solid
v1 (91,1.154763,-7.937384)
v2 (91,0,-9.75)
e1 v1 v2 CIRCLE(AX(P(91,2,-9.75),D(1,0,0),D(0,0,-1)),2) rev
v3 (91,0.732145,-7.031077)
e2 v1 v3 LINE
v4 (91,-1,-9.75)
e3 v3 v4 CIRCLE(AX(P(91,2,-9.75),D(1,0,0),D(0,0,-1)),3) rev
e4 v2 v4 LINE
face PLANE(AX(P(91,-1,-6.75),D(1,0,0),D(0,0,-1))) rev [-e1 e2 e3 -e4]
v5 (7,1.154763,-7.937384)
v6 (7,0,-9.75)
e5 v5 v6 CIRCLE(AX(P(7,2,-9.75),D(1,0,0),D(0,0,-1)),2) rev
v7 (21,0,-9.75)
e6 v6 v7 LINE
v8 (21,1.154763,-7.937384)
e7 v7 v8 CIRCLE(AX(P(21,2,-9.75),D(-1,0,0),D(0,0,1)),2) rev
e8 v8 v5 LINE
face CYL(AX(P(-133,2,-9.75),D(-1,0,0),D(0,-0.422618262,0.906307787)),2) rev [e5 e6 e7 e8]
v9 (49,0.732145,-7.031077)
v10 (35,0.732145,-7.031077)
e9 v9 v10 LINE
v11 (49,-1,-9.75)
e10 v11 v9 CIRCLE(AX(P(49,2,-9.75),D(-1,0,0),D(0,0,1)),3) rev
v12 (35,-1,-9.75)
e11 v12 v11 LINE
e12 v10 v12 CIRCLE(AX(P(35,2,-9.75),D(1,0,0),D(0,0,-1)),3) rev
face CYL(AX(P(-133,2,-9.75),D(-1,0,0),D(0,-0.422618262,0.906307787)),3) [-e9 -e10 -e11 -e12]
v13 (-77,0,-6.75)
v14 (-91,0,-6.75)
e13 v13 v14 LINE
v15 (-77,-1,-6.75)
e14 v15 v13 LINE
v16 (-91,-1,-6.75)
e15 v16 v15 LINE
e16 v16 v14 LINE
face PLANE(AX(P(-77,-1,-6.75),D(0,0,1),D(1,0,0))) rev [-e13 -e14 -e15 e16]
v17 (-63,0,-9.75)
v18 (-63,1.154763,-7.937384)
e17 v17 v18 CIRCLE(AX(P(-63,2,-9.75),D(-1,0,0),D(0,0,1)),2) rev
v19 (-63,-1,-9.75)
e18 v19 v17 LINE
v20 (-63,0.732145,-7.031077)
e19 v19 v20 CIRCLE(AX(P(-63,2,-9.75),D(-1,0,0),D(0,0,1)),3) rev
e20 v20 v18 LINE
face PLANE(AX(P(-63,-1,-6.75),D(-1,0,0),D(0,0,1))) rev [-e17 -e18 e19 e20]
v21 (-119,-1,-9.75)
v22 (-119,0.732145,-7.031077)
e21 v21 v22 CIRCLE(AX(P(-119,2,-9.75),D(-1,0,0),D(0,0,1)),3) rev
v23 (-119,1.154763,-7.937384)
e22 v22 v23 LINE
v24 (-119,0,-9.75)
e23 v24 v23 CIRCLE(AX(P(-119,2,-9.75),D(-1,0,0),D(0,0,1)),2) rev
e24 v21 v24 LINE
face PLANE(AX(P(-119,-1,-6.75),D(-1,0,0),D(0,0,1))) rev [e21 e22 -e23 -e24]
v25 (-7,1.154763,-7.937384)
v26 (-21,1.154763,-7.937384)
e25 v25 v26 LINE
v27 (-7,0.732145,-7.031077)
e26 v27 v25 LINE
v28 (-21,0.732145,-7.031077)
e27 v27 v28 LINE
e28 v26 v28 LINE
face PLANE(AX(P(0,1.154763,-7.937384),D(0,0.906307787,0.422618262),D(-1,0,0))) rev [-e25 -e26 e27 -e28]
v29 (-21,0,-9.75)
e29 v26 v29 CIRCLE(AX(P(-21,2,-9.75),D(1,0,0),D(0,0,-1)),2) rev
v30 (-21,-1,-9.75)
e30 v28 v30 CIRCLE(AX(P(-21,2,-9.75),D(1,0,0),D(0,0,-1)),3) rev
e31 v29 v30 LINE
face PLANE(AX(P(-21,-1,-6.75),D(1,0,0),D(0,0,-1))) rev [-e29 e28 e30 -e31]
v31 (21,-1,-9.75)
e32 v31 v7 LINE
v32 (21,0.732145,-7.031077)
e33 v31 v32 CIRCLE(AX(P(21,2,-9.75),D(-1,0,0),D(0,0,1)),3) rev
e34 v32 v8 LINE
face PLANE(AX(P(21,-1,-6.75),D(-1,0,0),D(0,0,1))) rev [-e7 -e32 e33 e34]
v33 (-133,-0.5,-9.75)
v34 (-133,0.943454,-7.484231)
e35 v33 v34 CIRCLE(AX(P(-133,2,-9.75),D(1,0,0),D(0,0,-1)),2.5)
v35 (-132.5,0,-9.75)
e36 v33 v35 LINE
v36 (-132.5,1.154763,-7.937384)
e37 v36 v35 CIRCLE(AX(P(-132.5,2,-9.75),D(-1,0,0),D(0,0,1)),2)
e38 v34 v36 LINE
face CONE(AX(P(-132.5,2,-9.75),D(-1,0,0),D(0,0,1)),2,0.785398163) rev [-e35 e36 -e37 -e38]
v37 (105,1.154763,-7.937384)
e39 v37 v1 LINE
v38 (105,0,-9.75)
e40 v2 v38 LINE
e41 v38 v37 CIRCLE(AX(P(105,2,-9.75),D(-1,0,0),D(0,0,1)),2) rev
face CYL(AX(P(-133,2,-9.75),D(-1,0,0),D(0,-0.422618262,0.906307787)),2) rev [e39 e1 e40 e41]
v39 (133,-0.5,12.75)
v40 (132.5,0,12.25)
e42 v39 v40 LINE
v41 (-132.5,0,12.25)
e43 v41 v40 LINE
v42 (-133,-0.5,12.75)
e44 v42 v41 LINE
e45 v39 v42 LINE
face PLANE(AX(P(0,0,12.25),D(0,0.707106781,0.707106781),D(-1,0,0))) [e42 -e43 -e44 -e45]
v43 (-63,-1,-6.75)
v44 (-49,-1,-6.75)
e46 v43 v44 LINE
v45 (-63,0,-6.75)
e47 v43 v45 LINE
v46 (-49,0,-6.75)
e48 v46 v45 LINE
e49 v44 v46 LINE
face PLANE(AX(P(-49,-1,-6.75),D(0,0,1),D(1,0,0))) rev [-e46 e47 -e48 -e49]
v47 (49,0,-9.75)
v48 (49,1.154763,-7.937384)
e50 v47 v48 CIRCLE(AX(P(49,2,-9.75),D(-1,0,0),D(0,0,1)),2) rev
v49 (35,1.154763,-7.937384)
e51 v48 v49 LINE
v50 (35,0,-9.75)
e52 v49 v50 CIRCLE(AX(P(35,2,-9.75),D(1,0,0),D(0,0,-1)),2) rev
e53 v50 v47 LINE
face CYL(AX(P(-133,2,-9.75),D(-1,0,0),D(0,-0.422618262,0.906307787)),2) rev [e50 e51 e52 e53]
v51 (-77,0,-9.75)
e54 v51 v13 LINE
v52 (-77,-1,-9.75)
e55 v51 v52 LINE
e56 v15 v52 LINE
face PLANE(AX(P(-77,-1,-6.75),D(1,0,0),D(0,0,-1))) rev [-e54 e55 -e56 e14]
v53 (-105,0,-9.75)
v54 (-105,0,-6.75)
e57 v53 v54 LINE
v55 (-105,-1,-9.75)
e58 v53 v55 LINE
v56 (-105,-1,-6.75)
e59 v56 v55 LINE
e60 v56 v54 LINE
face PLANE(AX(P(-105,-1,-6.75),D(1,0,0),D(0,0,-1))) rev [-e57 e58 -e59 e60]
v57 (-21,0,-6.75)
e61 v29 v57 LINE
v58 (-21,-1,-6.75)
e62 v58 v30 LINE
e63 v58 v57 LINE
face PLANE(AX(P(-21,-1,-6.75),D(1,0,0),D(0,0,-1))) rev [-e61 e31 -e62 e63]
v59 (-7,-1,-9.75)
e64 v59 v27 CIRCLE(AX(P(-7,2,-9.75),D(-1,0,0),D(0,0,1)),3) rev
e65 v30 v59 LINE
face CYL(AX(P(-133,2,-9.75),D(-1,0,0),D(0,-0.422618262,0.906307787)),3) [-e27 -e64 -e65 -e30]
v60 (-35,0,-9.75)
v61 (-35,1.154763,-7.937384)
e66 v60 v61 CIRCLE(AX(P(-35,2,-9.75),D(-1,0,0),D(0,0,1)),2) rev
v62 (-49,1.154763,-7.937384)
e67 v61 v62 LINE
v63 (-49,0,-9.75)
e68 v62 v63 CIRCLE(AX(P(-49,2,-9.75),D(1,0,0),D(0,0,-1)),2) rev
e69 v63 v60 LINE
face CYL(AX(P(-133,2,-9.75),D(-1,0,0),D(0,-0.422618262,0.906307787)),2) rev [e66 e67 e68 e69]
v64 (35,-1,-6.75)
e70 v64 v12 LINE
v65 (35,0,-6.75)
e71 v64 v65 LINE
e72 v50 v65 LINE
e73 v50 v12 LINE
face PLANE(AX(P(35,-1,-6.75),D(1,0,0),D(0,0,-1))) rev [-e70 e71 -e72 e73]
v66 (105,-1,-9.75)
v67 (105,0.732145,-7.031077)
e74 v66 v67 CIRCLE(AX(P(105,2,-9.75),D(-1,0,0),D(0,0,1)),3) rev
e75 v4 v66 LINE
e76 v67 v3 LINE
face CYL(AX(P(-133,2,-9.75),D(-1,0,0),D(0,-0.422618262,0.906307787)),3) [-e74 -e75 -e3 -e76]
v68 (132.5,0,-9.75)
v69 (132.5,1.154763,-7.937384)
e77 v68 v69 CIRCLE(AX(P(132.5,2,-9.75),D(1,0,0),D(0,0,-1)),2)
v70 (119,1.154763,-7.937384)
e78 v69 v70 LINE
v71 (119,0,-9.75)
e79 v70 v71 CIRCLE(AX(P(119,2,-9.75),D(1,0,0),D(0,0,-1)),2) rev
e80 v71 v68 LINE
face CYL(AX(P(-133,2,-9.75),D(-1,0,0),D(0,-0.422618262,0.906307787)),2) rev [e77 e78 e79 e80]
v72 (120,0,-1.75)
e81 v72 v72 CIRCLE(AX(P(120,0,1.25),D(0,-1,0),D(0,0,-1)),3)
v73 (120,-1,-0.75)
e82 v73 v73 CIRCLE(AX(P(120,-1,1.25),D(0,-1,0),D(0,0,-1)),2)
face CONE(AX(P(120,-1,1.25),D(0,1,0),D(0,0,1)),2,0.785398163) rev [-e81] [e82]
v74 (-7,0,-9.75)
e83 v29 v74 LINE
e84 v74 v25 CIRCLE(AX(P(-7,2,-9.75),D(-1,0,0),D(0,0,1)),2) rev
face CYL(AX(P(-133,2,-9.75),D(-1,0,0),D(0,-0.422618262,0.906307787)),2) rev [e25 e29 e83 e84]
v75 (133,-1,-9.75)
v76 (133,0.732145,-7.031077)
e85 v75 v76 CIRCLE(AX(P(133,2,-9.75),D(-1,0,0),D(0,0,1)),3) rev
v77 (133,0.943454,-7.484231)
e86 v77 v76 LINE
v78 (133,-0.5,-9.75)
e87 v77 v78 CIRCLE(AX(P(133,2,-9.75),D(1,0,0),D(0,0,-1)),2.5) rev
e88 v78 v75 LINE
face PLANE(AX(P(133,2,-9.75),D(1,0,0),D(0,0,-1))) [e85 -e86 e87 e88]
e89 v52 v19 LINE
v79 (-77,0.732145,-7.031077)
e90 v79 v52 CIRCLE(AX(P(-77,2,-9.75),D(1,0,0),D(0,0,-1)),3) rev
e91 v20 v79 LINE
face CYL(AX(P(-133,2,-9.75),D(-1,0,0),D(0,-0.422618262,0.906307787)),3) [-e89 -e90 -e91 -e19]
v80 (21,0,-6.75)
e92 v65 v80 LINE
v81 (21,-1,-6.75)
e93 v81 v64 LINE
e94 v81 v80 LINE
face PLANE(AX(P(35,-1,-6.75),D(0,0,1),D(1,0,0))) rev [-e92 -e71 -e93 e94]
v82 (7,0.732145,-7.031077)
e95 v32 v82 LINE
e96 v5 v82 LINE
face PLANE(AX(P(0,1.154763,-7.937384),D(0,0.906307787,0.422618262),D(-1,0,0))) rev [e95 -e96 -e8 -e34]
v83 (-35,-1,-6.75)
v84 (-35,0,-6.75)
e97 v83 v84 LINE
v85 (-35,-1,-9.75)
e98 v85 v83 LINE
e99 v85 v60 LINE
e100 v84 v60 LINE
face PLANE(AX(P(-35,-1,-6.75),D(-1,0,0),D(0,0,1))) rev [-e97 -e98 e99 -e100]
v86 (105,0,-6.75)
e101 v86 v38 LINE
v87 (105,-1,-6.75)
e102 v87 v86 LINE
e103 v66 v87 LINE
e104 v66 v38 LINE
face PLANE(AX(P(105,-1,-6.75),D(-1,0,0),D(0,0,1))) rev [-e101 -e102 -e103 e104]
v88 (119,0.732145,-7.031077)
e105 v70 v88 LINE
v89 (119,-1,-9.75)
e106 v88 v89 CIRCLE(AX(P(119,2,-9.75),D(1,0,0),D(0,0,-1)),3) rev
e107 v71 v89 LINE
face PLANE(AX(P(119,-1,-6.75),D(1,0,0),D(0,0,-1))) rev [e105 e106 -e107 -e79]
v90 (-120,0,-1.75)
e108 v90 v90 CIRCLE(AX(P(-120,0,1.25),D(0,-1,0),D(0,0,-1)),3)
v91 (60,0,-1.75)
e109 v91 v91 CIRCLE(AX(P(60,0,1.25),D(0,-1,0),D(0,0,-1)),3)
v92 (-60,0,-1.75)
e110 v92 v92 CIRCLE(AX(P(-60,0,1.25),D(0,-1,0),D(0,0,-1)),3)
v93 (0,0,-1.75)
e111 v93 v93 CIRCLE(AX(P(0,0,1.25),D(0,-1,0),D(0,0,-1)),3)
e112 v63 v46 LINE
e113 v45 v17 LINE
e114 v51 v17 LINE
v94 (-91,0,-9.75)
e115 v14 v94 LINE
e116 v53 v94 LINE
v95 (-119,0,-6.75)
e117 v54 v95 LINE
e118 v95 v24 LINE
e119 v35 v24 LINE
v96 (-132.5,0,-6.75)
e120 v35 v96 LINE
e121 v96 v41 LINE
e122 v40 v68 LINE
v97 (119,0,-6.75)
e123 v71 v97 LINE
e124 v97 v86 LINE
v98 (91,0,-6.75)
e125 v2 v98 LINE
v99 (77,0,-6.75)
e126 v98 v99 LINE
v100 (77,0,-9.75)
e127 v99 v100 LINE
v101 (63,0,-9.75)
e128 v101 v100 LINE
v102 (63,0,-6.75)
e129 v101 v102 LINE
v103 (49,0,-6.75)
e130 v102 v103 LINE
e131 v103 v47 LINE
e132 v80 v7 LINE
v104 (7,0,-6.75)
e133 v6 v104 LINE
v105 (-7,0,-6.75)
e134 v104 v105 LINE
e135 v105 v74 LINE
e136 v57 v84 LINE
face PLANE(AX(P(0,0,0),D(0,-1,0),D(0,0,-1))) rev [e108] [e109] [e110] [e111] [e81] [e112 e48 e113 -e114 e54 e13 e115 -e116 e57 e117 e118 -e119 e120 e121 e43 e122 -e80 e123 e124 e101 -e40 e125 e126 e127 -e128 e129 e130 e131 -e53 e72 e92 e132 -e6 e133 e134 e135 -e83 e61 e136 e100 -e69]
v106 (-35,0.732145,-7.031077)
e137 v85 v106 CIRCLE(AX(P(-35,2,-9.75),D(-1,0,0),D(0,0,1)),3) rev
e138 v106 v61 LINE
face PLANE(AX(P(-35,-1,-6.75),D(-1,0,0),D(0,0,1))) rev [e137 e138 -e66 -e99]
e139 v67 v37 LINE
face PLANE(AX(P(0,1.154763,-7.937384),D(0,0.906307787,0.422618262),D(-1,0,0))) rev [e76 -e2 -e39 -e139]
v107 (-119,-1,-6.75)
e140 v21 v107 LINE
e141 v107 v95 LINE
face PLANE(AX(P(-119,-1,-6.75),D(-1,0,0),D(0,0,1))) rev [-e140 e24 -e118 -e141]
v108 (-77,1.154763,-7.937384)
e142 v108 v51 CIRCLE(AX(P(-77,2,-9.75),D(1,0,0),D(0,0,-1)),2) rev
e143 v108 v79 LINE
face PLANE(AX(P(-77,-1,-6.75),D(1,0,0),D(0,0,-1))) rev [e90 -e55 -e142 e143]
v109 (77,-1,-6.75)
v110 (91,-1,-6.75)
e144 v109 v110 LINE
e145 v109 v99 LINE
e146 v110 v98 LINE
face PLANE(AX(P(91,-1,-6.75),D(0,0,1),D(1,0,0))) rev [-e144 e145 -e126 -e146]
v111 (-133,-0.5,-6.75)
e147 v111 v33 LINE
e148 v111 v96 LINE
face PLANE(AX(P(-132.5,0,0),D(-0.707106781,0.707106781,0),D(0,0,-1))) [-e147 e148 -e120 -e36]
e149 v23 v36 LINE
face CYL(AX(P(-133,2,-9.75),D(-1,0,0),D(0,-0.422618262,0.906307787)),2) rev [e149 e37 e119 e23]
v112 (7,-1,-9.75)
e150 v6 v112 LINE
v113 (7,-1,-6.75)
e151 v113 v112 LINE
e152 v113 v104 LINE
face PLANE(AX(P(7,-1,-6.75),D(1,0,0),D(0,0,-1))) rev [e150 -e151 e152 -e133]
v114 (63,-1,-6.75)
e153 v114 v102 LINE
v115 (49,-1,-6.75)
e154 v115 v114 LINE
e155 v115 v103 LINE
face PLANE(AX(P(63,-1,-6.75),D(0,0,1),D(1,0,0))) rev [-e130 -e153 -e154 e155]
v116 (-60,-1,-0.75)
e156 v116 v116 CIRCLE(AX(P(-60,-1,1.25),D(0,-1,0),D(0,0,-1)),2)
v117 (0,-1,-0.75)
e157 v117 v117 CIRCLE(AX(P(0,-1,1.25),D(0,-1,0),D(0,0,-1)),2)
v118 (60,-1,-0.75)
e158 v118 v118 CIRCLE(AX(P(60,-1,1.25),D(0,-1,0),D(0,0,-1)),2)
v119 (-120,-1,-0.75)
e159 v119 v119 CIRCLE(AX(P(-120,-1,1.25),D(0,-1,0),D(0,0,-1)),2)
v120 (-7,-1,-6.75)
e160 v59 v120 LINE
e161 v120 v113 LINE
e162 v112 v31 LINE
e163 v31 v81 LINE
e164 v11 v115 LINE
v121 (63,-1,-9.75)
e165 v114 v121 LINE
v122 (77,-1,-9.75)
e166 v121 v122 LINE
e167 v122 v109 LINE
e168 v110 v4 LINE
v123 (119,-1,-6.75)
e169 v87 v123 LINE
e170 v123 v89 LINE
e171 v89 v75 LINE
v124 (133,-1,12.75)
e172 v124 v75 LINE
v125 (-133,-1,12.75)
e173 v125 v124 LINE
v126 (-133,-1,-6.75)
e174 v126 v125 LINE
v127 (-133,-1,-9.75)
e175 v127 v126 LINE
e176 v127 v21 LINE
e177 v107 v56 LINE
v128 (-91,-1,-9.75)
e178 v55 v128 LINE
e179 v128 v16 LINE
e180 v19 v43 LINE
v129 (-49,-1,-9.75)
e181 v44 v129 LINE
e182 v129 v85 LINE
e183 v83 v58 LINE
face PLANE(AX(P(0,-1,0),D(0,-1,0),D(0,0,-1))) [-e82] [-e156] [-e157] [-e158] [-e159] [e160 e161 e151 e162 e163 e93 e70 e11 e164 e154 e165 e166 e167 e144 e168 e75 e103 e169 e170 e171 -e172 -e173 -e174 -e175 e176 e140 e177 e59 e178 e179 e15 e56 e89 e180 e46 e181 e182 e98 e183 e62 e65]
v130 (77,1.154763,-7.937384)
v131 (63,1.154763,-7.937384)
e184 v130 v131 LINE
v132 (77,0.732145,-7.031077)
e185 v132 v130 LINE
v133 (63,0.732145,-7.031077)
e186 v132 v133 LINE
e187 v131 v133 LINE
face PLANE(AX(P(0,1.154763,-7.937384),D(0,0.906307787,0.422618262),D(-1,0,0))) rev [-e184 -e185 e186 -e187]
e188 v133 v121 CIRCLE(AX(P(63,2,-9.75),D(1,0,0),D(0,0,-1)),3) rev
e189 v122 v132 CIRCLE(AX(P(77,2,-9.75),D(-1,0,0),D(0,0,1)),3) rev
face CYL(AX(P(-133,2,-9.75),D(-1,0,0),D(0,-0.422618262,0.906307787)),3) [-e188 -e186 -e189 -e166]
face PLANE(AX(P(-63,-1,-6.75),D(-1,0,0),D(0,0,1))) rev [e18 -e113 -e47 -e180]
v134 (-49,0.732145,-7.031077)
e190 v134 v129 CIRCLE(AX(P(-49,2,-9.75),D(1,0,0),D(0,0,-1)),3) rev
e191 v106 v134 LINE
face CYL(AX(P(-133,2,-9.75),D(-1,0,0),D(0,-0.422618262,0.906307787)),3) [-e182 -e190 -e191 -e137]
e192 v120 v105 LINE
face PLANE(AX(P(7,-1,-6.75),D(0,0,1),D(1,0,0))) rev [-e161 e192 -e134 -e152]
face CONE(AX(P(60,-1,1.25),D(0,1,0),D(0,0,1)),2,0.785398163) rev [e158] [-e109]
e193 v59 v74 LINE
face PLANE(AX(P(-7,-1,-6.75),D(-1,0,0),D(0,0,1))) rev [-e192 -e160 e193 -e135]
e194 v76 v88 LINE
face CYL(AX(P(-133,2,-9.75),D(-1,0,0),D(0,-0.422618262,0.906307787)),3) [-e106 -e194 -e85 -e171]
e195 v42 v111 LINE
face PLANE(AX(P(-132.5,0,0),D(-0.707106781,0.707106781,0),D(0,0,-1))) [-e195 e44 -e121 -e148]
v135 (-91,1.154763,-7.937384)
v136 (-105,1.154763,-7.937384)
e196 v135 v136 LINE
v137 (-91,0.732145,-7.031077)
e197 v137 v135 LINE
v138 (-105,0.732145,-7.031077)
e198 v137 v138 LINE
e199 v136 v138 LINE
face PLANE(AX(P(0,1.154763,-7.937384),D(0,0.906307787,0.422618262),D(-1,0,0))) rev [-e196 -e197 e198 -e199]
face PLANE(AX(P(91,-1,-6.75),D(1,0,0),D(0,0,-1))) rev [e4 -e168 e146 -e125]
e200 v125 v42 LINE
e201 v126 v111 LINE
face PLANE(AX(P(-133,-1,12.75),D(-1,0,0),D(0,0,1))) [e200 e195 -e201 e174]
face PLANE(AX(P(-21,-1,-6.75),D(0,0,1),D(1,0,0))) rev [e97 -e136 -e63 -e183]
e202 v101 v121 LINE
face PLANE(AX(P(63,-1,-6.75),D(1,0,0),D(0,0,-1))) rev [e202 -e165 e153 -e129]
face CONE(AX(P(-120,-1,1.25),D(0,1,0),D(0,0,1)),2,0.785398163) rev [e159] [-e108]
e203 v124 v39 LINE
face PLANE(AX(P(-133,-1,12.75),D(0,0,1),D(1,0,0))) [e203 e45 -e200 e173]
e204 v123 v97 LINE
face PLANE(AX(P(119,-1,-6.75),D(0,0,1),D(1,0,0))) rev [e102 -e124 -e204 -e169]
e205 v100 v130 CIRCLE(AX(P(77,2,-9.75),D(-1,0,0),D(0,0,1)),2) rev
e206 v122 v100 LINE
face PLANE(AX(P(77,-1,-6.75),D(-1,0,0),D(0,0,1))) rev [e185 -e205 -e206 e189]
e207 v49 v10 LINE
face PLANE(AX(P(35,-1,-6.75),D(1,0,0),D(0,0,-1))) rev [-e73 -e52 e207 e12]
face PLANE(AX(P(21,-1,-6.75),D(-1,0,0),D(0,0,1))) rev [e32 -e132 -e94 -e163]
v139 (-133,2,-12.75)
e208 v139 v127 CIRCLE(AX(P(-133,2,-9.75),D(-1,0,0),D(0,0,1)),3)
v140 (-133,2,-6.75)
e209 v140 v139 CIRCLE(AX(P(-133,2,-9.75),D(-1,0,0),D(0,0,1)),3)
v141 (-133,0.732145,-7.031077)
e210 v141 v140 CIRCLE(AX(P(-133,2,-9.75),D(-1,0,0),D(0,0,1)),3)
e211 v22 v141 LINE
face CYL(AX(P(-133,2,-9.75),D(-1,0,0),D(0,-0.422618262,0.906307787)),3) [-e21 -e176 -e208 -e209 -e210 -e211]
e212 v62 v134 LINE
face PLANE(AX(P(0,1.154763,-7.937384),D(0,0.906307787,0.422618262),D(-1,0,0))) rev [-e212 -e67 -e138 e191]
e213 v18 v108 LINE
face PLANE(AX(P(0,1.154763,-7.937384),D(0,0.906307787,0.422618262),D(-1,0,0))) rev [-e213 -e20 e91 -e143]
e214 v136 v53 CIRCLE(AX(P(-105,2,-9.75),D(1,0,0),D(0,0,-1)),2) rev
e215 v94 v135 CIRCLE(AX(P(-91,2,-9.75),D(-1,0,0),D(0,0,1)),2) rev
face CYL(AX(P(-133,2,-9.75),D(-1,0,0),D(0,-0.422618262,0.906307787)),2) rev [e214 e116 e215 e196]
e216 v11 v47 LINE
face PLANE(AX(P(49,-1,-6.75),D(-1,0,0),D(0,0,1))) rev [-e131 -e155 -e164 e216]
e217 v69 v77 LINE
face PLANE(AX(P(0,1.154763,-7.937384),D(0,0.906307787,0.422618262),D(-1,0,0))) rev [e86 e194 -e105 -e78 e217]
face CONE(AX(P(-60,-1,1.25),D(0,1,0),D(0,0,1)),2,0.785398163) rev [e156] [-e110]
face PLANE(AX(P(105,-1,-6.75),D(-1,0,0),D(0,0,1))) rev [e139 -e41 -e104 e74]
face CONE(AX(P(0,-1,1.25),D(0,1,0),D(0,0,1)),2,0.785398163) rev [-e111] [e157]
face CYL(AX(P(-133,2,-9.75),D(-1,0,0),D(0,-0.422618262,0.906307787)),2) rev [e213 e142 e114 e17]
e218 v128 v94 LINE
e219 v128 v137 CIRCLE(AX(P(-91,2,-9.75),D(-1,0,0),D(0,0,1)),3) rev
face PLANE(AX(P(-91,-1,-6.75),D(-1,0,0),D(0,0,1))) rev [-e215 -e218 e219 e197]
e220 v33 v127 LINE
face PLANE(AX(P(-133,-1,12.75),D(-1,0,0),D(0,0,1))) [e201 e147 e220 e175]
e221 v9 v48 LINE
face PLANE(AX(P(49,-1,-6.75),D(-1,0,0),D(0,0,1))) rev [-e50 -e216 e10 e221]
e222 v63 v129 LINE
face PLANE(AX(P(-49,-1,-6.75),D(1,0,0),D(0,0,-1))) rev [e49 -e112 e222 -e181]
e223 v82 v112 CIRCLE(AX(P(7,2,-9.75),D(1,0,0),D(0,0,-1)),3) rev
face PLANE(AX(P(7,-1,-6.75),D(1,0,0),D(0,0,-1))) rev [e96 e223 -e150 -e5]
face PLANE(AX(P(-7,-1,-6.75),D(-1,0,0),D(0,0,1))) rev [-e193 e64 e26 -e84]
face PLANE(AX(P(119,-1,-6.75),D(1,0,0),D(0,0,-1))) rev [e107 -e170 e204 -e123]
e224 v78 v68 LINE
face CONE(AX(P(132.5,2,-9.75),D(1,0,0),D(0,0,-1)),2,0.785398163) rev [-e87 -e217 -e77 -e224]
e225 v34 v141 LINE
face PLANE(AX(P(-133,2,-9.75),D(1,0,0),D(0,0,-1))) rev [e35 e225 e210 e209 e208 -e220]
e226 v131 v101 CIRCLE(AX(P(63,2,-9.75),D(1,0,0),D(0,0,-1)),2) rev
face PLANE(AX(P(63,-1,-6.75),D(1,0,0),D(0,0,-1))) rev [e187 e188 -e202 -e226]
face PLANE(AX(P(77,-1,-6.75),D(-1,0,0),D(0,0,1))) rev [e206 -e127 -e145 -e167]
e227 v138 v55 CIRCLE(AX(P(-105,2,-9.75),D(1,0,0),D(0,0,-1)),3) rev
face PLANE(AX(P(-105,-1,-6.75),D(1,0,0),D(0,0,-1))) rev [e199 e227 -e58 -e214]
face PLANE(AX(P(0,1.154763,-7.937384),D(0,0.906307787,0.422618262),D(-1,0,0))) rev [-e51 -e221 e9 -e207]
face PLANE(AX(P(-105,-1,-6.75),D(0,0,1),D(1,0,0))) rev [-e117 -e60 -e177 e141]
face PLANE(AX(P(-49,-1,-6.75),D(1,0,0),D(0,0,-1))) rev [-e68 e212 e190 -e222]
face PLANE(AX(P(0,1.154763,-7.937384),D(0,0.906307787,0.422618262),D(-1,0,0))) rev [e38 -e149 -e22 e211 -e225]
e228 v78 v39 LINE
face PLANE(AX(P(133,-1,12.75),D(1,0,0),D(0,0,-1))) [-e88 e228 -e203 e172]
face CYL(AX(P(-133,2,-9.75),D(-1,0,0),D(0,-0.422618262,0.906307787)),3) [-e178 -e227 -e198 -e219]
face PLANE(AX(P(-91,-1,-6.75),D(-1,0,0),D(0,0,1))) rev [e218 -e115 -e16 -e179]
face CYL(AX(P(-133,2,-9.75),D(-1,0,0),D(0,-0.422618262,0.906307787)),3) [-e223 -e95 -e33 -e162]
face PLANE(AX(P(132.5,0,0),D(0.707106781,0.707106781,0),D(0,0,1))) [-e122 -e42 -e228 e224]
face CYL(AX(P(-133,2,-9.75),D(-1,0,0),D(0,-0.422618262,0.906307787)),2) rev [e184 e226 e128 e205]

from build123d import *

# Parameters (mm, degrees)
SKETCH1_W          = 266
SKETCH1_H          = 25.5
BASE_FLANGE1_DEPTH = 1
HEM1_START         = -133
HEM1_DEPTH         = 266
HEM1_2_DEPTH       = 266
CUT_EXTRUDE1_START = -134.703262862
SKETCH8_W          = 14
SKETCH8_H          = 6
CUT_EXTRUDE1_DEPTH = 259.406525724
LPATTERN1_COUNT    = 11
LPATTERN1_PITCH    = 28
CHAMFER1_SIZE      = 0.5
SKETCH9_R          = 2
CUT_EXTRUDE2_DEPTH = 10
LPATTERN2_COUNT    = 5
LPATTERN2_PITCH    = 60
CHAMFER2_SIZE      = 1


# Read off the part's stored shape, not the designer's step: Hem1
# Sheet-metal steps are written as plain solids
with BuildPart() as part:
    # Sketch1 → Base-Flange1 (new body)
    with BuildSketch(Plane(origin=(0, 0, 0), x_dir=(1, 0, 0), z_dir=(0, 1, 0))):
        Rectangle(SKETCH1_W, SKETCH1_H)
    extrude(amount=-BASE_FLANGE1_DEPTH)

    # Hem1 outline → Hem1 (cut)
    with BuildSketch(Plane.YZ.offset(HEM1_START)):
        with BuildLine():
            Line((0, -12.75), (0, -11.986067977))
            ThreePointArc((0, -11.986067977), (-0.738612788, -10.974744871), (-1, -9.75))
            Line((-1, -9.75), (-1, -12.75))
            Line((-1, -12.75), (0, -12.75))
        make_face()
    extrude(amount=HEM1_DEPTH, mode=Mode.SUBTRACT)

    # Hem1 2 outline → Hem1 2 (add)
    with BuildSketch(Plane.YZ.offset(HEM1_START)):
        with BuildLine():
            Line((0.732145215, -7.031076639), (1.154763477, -7.937384426))
            ThreePointArc((1.154763477, -7.937384426), (3.686782892, -10.824599218), (0, -9.75))
            Line((0, -9.75), (0, -11.986067977))
            ThreePointArc((0, -11.986067977), (4.967777538, -10.18851623), (0.732145215, -7.031076639))
        make_face()
    extrude(amount=HEM1_2_DEPTH)

    # Sketch8 → Cut-Extrude1 (cut)
    with BuildSketch(Plane(origin=(0, 0, 0), x_dir=(1, 0, 0), z_dir=(0, 1, 0)).offset(CUT_EXTRUDE1_START)):
        with Locations((112, 9.75)):
            Rectangle(SKETCH8_W, SKETCH8_H)
    cut_extrude1 = extrude(amount=CUT_EXTRUDE1_DEPTH, mode=Mode.SUBTRACT)

    # LPattern1: Cut-Extrude1 ×11
    with Locations(*[(-i * LPATTERN1_PITCH, 0, 0) for i in range(1, LPATTERN1_COUNT)]):
        add(cut_extrude1, mode=Mode.SUBTRACT)

    # Chamfer1
    chamfer1_edges = [part.edges().sort_by_distance(p)[0] for p in [
        (-133, 0, 1.5),
        (133, 3.686782892, -10.824599218),
        (-133, 3.686782892, -10.824599218),
        (-133, 0, 1.5),
        (0, 0, 12.75),
        (133, 0, 1.5),
    ]]
    chamfer(chamfer1_edges, length=CHAMFER1_SIZE)

    # Sketch9 → Cut-Extrude2 (cut)
    with BuildSketch(Plane(origin=(0, 0, 0), x_dir=(1, 0, 0), z_dir=(0, 1, 0))):
        with Locations(Location((-120, -1.25, 0), (0, 0, 270))):
            Circle(SKETCH9_R)
    cut_extrude2 = extrude(amount=-CUT_EXTRUDE2_DEPTH, mode=Mode.SUBTRACT)

    # LPattern2: Cut-Extrude2 ×5
    with Locations(*[(i * LPATTERN2_PITCH, 0, 0) for i in range(1, LPATTERN2_COUNT)]):
        add(cut_extrude2, mode=Mode.SUBTRACT)

    # Chamfer2
    chamfer2_edges = [part.edges().sort_by_distance(p)[0] for p in [
        (-120, 0, -0.75),
        (-60, 0, -0.75),
        (0, 0, -0.75),
        (60, 0, -0.75),
        (120, 0, -0.75),
    ]]
    chamfer(chamfer2_edges, length=CHAMFER2_SIZE - 0.0001)  # a hair under: the kernel refuses the full size


solid = part.part
